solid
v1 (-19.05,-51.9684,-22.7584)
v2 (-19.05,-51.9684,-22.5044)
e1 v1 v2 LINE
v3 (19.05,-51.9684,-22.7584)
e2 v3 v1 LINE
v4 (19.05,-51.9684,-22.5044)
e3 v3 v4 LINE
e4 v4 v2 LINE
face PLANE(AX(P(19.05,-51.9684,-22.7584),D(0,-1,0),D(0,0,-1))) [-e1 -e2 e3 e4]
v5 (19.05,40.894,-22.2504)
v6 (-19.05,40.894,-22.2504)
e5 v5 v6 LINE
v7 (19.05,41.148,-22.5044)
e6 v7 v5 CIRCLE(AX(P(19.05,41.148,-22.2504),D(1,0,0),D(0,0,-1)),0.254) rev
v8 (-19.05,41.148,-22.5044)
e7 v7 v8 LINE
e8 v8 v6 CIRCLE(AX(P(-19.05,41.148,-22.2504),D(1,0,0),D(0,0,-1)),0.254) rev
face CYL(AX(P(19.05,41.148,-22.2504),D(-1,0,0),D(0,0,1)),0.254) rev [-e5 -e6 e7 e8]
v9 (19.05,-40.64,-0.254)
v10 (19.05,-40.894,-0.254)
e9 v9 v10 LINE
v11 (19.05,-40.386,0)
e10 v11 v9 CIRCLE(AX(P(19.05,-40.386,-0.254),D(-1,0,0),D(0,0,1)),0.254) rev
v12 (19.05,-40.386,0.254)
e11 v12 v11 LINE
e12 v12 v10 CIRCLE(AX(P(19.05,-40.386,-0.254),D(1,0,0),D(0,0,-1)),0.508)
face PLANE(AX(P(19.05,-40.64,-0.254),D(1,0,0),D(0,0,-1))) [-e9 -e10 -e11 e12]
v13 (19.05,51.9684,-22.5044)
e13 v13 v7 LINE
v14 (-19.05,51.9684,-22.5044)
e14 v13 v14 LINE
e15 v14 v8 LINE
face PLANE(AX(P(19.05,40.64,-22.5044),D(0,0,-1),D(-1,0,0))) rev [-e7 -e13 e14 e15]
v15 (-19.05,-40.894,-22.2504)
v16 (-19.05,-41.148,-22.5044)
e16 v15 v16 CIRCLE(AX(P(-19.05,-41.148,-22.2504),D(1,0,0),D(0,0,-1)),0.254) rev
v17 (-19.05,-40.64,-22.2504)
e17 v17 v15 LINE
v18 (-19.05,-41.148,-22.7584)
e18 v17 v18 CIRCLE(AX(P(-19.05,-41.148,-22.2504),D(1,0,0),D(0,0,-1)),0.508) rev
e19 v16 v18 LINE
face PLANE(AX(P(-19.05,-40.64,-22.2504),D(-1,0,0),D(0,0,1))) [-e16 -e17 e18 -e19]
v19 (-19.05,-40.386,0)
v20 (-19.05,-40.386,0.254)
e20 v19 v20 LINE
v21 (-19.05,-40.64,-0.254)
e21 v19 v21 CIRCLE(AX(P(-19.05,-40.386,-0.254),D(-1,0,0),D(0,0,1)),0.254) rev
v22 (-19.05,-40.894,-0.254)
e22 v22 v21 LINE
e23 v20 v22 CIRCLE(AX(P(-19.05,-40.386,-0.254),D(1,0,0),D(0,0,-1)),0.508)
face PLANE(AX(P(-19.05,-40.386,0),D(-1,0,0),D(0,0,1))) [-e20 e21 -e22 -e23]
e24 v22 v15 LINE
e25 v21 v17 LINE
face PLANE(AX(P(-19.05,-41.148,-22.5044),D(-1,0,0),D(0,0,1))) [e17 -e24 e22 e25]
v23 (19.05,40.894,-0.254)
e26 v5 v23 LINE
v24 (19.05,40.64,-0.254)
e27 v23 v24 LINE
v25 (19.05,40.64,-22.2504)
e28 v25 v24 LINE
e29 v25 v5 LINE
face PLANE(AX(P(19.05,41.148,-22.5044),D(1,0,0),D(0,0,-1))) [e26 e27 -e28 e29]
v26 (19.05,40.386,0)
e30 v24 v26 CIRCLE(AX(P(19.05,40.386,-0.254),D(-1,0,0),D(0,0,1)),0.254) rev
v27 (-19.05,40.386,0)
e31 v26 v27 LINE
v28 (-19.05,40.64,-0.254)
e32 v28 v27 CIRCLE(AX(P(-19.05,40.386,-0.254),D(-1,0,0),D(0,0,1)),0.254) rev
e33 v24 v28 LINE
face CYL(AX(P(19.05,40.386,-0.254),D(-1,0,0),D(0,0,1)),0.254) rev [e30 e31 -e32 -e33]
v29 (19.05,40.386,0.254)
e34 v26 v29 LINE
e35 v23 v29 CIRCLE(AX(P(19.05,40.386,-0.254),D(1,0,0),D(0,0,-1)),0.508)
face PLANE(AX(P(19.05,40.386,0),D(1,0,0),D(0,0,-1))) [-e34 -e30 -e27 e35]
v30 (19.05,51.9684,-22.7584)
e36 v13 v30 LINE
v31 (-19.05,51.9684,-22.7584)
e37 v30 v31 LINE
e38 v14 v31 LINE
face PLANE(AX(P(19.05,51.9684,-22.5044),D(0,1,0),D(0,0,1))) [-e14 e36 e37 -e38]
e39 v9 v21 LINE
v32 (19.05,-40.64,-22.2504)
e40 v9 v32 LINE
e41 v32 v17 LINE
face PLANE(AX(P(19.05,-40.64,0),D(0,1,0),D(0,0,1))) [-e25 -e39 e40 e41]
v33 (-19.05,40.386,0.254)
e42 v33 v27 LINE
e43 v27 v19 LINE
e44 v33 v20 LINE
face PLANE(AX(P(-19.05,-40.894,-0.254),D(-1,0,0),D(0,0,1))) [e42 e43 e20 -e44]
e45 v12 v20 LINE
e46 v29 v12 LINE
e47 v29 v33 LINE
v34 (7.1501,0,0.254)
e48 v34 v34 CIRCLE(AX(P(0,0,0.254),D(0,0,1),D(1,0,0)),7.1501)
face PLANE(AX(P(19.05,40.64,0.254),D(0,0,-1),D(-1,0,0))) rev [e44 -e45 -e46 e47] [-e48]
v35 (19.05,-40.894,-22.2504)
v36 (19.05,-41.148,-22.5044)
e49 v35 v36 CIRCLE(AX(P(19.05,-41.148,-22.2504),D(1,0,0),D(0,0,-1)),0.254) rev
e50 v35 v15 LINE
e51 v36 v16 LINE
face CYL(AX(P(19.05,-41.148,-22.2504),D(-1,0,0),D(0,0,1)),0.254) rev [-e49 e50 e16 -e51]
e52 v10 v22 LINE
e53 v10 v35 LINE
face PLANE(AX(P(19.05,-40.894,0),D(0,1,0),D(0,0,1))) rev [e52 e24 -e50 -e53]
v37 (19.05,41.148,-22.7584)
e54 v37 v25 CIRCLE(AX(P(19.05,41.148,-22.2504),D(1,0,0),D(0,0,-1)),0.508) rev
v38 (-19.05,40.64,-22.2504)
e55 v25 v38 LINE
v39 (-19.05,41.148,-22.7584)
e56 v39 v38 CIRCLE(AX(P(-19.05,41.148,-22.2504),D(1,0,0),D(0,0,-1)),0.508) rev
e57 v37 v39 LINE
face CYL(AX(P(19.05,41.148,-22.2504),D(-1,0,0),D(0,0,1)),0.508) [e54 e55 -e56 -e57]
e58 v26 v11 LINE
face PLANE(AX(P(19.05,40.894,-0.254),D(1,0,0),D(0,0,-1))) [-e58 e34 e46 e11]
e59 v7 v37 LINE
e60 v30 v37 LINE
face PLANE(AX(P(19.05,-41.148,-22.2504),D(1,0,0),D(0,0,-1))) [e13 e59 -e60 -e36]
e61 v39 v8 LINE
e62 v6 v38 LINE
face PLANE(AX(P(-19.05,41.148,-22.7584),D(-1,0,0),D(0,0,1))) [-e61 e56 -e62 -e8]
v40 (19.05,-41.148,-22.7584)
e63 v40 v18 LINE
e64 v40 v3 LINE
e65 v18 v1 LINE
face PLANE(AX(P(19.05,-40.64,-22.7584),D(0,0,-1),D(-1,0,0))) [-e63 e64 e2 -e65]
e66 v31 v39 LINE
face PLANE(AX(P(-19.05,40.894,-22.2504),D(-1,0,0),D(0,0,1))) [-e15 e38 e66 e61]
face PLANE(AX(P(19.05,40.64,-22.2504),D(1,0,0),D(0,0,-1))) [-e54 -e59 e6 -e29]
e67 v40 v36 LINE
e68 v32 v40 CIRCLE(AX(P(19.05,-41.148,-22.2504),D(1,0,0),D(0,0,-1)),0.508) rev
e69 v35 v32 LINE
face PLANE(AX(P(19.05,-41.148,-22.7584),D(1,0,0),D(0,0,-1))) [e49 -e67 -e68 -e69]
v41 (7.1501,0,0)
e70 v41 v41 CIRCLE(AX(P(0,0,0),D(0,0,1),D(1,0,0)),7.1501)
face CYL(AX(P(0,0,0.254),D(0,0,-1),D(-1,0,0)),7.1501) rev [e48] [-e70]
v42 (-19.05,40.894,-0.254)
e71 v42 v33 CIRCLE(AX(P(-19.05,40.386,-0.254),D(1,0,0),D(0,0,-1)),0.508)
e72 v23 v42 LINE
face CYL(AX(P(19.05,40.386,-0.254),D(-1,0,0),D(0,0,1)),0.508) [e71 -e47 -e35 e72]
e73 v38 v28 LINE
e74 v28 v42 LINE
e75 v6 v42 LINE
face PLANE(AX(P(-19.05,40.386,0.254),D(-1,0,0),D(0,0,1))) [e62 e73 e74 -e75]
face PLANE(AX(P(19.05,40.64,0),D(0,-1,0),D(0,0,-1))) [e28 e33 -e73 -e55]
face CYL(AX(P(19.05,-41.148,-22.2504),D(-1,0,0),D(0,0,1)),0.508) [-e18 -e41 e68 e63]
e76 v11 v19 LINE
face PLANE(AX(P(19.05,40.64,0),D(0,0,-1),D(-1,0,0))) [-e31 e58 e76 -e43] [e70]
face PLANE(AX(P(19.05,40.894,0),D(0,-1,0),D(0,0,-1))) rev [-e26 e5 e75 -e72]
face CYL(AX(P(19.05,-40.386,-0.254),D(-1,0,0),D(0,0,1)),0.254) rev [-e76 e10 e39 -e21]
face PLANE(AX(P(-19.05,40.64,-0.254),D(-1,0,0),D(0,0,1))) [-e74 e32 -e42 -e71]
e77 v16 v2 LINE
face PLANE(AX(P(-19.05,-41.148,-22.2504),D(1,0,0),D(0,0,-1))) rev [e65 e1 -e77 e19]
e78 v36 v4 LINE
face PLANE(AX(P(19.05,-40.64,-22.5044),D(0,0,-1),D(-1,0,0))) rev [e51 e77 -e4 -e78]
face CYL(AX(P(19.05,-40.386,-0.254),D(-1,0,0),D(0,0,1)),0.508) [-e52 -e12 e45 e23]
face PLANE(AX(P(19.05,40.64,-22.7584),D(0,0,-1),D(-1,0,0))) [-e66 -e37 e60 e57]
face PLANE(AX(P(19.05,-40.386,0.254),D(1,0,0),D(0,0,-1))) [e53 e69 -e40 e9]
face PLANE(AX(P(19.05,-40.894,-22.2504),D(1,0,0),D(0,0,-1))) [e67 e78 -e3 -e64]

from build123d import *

# Parameters (mm, degrees)
BASE_FLANGE1_DEPTH = 19.05
SKETCH5_R          = 7.1501
CUT_EXTRUDE1_DEPTH = 60.846151665


# Sheet-metal steps are written as plain solids
with BuildPart() as part:
    # Sketch1 → Base-Flange1 (new, symmetric)
    with BuildSketch(Plane(origin=(0, 0, 0), x_dir=(0, 0, -1), z_dir=(1, 0, 0))):
        with BuildLine():
            Line((22.7584, 51.9684), (22.7584, 41.148))
            ThreePointArc((22.7584, 41.148), (22.609610245, 40.788789755), (22.2504, 40.64))
            Line((22.2504, 40.64), (0.254, 40.64))
            ThreePointArc((0.254, 40.64), (0.074394878, 40.565605122), (0, 40.386))
            Line((0, 40.386), (0, -40.386))
            ThreePointArc((0, -40.386), (0.074394878, -40.565605122), (0.254, -40.64))
            Line((0.254, -40.64), (22.2504, -40.64))
            ThreePointArc((22.2504, -40.64), (22.609610245, -40.788789755), (22.7584, -41.148))
            Line((22.7584, -41.148), (22.7584, -51.9684))
            Line((22.7584, -51.9684), (22.5044, -51.9684))
            Line((22.5044, -51.9684), (22.5044, -41.148))
            ThreePointArc((22.5044, -41.148), (22.430005122, -40.968394878), (22.2504, -40.894))
            Line((22.2504, -40.894), (0.254, -40.894))
            ThreePointArc((0.254, -40.894), (-0.105210245, -40.745210245), (-0.254, -40.386))
            Line((-0.254, -40.386), (-0.254, 40.386))
            ThreePointArc((-0.254, 40.386), (-0.105210245, 40.745210245), (0.254, 40.894))
            Line((0.254, 40.894), (22.2504, 40.894))
            ThreePointArc((22.2504, 40.894), (22.430005122, 40.968394878), (22.5044, 41.148))
            Line((22.5044, 41.148), (22.5044, 51.9684))
            Line((22.5044, 51.9684), (22.7584, 51.9684))
        make_face()
    extrude(amount=BASE_FLANGE1_DEPTH, both=True)

    # Sketch5 → Cut-Extrude1 (cut, through all)
    with BuildSketch(Plane.XY):
        Circle(SKETCH5_R)
    extrude(amount=CUT_EXTRUDE1_DEPTH, mode=Mode.SUBTRACT)


solid = part.part
